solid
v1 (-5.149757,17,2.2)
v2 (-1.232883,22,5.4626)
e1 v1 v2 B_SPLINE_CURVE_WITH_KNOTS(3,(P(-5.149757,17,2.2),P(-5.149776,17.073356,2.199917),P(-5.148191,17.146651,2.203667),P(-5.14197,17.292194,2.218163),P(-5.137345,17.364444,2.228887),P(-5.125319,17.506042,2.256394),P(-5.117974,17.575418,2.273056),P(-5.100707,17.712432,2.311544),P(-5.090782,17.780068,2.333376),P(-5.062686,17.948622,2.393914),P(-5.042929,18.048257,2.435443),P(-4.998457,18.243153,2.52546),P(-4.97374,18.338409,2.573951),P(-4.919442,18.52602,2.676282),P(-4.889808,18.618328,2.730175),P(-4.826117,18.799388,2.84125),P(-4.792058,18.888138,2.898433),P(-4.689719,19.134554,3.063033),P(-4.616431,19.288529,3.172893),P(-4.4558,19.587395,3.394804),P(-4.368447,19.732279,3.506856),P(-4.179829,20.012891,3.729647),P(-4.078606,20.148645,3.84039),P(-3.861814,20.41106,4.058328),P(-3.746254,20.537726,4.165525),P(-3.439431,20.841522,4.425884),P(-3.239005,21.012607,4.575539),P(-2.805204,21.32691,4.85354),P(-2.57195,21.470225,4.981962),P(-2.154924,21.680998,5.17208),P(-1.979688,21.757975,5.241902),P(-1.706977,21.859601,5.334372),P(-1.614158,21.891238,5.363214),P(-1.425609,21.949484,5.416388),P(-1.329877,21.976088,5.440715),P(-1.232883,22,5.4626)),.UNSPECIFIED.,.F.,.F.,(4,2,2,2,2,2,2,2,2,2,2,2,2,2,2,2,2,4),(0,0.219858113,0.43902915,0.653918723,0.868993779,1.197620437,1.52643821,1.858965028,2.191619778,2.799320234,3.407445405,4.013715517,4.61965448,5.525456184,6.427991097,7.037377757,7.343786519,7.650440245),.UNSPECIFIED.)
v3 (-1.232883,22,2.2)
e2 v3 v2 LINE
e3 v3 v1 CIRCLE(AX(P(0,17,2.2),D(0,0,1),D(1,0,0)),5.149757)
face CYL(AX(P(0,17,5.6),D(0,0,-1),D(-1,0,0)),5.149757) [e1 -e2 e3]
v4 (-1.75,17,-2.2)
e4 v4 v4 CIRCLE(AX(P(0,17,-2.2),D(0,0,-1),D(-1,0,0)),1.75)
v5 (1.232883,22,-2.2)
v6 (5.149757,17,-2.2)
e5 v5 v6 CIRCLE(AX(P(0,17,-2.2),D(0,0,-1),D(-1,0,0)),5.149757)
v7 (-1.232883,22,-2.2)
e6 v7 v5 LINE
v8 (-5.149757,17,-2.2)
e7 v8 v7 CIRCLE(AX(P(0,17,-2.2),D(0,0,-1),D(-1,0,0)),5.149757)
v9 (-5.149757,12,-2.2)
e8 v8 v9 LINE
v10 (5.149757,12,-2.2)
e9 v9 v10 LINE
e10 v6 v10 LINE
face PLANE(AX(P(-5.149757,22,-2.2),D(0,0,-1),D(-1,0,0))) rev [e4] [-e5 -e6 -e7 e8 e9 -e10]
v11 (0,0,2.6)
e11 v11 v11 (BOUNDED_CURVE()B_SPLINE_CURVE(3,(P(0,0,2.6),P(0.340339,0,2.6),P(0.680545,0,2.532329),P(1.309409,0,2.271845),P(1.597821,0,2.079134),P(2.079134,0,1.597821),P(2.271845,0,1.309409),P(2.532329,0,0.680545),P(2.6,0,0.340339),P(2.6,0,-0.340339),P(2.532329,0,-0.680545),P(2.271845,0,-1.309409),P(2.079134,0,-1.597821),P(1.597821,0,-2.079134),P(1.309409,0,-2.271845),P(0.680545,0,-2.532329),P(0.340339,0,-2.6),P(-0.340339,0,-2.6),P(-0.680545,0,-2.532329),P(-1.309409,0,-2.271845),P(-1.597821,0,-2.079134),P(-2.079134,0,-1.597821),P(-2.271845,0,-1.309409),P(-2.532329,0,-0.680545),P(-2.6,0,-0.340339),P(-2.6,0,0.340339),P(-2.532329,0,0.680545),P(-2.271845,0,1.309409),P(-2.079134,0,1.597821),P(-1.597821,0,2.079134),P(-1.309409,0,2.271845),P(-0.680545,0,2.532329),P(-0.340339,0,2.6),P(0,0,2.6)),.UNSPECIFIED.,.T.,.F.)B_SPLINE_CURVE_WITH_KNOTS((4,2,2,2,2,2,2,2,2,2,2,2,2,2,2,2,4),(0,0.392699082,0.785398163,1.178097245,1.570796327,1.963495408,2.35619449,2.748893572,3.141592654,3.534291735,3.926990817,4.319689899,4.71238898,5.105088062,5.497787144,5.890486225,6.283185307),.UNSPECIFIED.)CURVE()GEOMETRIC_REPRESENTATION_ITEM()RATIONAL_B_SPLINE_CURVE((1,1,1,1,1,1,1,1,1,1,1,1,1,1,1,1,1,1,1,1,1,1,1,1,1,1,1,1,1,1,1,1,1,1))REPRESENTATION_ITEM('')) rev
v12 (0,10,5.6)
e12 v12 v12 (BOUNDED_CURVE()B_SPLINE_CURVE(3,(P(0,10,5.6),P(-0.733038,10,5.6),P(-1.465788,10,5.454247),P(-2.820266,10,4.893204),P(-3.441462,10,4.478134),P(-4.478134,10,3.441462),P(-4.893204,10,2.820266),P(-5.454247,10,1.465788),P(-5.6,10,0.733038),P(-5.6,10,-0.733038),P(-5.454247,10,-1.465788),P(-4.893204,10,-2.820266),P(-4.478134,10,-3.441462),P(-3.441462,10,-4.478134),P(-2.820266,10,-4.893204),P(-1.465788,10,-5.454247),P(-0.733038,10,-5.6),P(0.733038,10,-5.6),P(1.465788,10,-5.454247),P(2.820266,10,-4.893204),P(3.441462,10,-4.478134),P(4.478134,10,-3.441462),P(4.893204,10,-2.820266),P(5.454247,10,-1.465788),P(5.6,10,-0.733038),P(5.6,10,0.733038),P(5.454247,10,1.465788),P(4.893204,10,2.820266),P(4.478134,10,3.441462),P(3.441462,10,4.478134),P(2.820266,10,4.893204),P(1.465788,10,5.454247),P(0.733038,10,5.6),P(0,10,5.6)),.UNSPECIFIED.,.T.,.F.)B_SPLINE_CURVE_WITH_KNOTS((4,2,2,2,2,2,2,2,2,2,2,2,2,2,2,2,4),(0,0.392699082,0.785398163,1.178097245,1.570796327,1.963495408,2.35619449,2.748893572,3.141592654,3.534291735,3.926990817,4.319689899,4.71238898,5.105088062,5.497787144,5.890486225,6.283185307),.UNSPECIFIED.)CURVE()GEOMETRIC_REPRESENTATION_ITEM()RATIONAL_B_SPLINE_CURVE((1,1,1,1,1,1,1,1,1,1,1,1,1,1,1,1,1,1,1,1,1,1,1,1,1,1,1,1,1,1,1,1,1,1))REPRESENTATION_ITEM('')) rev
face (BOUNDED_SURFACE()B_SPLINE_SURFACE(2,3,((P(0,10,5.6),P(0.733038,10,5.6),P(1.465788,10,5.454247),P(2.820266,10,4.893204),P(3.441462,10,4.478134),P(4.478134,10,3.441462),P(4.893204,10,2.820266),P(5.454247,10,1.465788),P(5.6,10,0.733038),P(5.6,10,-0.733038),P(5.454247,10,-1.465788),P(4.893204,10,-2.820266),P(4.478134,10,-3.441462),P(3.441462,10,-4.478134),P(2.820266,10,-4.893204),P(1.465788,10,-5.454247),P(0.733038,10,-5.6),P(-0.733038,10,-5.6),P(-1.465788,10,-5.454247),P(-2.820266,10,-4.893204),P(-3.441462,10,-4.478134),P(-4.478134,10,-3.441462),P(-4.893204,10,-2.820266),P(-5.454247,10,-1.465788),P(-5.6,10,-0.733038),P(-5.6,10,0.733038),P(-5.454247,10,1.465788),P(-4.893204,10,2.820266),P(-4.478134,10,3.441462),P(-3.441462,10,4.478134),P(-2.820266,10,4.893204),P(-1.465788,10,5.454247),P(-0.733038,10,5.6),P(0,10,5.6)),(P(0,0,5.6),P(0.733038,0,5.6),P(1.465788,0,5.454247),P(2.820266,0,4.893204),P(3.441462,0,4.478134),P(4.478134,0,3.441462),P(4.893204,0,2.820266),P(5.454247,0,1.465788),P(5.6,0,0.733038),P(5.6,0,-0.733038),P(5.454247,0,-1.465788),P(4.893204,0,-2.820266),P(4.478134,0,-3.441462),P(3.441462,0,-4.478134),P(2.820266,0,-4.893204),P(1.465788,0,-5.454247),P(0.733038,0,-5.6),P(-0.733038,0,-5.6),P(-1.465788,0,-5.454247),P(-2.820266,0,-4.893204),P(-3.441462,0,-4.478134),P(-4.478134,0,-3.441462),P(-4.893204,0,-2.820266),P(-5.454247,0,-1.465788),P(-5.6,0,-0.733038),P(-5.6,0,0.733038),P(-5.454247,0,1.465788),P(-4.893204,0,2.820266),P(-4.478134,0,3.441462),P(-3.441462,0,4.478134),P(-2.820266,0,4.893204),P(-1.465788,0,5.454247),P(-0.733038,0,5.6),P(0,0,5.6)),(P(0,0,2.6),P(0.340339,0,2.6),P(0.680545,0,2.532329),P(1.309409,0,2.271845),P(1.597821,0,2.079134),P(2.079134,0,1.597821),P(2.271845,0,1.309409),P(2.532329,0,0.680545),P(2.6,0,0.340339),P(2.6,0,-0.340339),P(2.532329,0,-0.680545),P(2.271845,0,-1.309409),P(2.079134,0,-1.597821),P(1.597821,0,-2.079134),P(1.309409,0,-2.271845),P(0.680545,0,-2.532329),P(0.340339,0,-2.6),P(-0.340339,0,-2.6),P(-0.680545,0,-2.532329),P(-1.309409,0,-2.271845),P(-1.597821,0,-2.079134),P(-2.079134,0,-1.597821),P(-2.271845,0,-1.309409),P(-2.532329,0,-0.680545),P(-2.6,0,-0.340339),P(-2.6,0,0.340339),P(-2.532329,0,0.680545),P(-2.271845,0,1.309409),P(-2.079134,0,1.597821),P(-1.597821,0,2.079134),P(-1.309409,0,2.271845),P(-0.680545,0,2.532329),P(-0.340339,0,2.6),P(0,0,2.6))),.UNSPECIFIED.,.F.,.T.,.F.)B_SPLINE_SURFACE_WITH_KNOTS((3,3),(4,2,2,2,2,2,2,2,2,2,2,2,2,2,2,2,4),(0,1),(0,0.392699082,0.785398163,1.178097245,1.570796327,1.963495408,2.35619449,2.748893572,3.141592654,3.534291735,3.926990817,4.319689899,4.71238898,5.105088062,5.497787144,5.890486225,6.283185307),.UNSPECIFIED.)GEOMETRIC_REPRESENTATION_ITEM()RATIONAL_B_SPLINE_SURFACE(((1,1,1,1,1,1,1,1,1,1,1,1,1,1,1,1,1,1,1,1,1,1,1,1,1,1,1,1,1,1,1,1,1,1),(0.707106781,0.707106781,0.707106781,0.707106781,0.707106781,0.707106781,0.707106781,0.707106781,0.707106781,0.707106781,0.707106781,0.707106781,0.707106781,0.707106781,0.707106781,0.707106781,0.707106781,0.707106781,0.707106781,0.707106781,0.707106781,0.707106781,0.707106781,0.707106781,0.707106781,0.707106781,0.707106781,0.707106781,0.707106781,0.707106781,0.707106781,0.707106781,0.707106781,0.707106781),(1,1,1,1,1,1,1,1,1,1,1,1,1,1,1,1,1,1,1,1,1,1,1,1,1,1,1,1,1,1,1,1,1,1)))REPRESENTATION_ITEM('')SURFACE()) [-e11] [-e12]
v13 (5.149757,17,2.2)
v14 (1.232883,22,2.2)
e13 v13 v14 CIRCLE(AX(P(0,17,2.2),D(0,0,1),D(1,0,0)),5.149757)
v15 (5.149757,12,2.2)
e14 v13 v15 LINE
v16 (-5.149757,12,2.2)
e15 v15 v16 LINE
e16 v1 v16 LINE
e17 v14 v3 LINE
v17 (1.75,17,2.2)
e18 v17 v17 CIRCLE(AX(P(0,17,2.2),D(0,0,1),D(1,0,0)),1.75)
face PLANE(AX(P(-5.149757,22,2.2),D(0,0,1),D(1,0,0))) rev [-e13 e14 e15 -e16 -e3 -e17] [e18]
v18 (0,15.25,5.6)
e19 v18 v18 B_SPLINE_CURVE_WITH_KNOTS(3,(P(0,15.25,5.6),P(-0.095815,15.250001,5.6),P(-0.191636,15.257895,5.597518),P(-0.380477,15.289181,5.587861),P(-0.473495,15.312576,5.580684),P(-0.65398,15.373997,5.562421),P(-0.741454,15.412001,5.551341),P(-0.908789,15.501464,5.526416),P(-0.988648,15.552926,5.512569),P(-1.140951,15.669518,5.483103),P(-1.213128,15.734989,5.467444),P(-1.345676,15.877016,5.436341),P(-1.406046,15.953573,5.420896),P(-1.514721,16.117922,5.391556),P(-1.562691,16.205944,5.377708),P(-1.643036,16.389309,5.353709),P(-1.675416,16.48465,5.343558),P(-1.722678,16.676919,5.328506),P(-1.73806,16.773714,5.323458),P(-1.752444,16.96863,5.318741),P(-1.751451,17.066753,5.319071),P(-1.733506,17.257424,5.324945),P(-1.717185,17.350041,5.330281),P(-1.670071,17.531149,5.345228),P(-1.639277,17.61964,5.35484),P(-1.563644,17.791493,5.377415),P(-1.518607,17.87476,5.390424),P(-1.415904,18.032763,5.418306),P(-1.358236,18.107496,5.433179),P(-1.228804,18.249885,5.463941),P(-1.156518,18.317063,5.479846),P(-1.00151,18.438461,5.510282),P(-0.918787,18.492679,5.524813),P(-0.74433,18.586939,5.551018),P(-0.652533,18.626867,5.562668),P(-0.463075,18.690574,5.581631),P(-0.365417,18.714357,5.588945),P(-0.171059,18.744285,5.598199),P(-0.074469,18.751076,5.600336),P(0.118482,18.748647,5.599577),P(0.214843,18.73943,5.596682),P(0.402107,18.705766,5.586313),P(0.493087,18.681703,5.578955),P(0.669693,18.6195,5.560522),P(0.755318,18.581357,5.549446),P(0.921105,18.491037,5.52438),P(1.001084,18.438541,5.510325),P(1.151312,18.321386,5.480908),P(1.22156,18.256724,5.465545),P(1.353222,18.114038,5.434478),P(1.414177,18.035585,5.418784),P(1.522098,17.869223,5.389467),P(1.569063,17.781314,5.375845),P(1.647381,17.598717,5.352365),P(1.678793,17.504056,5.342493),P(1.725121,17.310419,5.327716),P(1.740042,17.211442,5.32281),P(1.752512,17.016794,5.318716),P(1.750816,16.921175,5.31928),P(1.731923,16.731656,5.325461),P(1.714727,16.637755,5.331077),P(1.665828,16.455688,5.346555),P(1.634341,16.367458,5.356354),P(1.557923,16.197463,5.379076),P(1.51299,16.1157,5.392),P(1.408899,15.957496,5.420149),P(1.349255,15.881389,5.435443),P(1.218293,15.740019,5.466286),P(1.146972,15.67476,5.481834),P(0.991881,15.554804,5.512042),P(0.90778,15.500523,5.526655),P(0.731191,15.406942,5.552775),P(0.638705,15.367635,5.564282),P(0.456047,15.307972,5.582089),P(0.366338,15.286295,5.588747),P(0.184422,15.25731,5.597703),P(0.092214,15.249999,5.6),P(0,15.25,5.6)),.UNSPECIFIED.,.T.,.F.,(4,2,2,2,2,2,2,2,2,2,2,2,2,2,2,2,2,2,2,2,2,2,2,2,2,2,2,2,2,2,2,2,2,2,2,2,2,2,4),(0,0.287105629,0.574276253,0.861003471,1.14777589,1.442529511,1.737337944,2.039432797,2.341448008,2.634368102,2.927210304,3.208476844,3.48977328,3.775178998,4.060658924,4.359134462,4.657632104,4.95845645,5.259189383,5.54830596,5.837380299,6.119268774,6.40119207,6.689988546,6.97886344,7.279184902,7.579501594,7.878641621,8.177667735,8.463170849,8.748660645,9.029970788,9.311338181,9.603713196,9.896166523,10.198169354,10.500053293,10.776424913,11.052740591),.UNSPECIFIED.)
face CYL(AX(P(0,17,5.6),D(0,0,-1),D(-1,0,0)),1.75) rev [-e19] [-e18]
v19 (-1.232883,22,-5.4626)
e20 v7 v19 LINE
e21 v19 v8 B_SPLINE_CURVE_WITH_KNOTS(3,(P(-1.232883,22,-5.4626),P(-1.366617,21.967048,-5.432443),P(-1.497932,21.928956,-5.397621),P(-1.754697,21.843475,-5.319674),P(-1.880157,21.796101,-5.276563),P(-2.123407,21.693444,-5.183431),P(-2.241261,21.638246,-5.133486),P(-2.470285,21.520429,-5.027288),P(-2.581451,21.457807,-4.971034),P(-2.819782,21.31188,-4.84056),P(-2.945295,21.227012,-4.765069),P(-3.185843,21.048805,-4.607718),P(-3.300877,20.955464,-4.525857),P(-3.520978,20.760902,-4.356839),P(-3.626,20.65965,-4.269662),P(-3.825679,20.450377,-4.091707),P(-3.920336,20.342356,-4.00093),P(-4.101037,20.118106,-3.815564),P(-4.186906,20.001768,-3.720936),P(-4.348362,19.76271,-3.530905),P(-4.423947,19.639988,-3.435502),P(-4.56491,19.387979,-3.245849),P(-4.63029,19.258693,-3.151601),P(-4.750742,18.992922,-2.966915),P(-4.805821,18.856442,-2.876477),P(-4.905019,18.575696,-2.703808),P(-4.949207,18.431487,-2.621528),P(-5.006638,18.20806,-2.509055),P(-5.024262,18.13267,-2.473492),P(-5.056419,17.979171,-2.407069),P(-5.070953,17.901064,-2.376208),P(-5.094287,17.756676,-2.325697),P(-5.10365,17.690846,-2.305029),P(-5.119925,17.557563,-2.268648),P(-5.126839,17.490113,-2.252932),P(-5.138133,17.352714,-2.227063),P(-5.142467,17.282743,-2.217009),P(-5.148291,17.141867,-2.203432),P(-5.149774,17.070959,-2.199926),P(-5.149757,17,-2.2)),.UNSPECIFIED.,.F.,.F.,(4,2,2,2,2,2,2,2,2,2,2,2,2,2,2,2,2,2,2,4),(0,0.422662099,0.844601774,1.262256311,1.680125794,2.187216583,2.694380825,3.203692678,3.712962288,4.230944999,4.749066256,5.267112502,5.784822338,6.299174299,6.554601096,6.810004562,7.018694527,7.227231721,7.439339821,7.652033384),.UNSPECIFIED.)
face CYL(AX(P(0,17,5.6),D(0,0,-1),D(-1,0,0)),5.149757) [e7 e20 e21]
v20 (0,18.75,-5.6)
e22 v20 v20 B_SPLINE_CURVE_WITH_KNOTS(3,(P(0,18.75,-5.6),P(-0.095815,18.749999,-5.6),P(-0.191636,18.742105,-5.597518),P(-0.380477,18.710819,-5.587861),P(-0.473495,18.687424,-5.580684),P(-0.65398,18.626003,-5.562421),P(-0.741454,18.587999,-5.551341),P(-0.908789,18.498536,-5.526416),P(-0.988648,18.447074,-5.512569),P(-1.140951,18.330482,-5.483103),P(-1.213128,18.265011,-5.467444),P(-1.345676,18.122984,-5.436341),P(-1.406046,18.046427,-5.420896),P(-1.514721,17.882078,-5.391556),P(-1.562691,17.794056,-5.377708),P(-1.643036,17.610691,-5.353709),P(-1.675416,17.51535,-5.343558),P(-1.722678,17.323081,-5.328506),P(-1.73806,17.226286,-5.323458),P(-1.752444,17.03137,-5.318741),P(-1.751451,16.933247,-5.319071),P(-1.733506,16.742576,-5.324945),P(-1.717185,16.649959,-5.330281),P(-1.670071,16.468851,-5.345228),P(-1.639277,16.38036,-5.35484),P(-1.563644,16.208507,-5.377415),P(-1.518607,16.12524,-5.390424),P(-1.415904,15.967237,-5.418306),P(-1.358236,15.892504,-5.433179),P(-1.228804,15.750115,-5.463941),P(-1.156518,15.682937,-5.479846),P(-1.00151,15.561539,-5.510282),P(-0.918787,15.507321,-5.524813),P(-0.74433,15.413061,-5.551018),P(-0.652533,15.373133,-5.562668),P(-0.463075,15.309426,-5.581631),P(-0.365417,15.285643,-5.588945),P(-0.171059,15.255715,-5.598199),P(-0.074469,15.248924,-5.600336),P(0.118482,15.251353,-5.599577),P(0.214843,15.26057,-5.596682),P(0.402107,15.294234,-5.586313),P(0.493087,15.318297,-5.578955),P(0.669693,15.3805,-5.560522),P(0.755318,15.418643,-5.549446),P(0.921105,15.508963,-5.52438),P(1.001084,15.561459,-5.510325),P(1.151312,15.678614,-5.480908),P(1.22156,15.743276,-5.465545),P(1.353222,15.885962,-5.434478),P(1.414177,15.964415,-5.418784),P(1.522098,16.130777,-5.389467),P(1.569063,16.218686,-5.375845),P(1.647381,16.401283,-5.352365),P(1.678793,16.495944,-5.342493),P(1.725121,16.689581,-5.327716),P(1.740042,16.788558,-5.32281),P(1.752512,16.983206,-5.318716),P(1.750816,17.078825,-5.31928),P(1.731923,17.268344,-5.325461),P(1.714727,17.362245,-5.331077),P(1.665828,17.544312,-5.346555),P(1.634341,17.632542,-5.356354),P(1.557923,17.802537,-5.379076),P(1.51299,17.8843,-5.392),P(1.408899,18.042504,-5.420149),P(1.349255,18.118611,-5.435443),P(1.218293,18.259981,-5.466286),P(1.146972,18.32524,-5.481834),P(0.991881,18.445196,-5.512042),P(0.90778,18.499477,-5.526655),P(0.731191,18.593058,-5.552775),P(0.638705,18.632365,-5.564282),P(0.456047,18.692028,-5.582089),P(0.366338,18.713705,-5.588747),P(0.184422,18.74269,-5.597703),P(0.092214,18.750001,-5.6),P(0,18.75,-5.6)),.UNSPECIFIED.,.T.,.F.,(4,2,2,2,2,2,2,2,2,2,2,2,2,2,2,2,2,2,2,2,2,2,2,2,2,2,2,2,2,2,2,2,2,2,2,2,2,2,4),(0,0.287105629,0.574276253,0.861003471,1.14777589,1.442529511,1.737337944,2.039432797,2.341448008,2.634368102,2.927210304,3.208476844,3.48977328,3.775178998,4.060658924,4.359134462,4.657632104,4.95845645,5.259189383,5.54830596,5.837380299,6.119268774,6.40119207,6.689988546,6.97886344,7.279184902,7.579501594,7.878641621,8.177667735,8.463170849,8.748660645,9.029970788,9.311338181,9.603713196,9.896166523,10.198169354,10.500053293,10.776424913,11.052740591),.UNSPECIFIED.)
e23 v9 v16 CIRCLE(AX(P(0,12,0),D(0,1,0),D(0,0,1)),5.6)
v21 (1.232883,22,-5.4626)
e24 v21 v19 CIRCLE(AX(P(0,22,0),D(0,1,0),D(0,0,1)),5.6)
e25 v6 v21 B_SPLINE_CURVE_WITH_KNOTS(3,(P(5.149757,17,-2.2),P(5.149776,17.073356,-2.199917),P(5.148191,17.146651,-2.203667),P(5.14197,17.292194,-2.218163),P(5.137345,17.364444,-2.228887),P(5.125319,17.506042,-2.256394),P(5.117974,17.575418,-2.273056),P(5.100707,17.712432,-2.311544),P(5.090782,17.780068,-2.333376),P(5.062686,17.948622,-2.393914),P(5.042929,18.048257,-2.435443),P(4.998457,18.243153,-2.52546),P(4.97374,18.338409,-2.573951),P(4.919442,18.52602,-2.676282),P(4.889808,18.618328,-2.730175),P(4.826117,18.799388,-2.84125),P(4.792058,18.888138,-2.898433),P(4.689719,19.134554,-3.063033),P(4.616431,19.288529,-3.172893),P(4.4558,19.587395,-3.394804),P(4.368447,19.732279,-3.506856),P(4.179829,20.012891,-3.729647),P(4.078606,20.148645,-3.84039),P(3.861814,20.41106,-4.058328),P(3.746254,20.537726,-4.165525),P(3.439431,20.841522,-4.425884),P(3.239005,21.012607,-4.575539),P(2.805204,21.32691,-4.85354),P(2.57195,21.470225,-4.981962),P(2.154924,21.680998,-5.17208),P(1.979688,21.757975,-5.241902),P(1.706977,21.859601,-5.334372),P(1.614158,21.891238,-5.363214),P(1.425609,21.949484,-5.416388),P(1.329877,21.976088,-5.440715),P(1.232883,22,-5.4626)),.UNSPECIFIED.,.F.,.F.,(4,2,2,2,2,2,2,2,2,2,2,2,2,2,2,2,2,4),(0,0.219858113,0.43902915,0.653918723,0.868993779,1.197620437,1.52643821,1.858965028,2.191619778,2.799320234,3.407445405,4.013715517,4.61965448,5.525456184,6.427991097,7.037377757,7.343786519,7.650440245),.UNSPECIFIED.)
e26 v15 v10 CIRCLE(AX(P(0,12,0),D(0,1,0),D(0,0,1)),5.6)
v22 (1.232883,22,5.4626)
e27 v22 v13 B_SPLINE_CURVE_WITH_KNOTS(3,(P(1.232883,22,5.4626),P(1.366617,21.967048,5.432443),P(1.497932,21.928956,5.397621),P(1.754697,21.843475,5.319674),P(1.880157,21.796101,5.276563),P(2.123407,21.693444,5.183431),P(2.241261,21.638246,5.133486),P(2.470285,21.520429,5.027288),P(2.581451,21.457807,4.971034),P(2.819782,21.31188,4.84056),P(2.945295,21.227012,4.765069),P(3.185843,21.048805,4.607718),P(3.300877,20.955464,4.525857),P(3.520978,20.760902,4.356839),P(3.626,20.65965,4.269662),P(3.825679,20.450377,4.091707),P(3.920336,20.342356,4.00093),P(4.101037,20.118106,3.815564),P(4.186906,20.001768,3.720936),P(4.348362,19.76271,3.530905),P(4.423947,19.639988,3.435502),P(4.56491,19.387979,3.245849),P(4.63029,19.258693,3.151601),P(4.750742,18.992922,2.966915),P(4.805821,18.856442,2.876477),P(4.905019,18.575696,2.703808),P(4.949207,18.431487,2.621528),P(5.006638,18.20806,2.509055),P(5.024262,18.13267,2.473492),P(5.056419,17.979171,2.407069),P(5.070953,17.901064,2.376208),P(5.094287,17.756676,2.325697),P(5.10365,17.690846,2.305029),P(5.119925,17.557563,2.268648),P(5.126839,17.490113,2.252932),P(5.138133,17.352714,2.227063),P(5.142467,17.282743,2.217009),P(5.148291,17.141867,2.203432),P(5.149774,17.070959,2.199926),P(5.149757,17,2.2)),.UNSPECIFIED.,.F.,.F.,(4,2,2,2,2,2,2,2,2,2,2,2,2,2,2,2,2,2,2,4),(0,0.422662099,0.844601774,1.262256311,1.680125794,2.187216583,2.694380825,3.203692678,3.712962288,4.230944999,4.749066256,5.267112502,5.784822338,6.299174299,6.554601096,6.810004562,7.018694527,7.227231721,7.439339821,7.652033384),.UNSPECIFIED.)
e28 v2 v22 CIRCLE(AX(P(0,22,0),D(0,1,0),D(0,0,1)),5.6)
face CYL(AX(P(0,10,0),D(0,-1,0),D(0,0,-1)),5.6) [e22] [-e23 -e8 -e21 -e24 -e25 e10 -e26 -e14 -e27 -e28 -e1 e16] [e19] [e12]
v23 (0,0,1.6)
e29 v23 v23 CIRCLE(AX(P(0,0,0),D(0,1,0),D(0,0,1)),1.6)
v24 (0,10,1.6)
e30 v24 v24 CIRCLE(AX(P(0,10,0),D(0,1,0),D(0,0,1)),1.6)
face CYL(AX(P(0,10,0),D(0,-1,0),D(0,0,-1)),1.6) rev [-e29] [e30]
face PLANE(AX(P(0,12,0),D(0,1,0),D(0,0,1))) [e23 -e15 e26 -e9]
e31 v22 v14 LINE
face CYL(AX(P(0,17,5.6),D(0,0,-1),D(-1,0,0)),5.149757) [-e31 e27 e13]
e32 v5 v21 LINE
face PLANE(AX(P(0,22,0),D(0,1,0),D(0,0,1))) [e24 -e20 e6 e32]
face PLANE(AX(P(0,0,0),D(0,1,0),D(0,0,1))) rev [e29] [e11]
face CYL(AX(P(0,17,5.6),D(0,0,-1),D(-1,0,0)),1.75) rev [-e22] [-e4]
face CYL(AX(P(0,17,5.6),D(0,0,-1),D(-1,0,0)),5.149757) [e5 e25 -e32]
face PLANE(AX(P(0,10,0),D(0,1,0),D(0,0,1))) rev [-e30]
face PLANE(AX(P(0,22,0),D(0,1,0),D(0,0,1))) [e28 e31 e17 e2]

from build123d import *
from build123d.topology import SkipClean

# Parameters (mm, degrees)
SKETCH1_R               = 5.6
SKETCH1_R_2             = 1.6
BOSS_EXTRUDE1_DEPTH     = 10
SKETCH2_R               = 5.6
BOSS_EXTRUDE2_DEPTH     = 2
BOSS_EXTRUDE3_DEPTH     = 10
CUT_EXTRUDE1_DEPTH      = 25.004166
CUT_EXTRUDE1_DEPTH_BACK = 25.004166
SKETCH4_R               = 1.75
FILLET1_SIZE            = 10
FILLET1_SIZE_2          = 3


with BuildPart() as part:
    # Sketch1 → Boss-Extrude1 (new body)
    with BuildSketch(Plane(origin=(0, 0, 0), x_dir=(1, 0, 0), z_dir=(0, 1, 0))):
        with Locations(Location((0, 0, 0), (0, 0, 270))):
            Circle(SKETCH1_R)
        with Locations(Location((0, 0, 0), (0, 0, 270))):
            Circle(SKETCH1_R_2, mode=Mode.SUBTRACT)
    extrude(amount=BOSS_EXTRUDE1_DEPTH)

    # Sketch2 → Boss-Extrude2 (add)
    with BuildSketch(Plane(origin=(0, 10, 0), x_dir=(1, 0, 0), z_dir=(0, 1, 0))):
        with Locations(Location((0, 0, 0), (0, 0, 270))):
            Circle(SKETCH2_R)
    extrude(amount=BOSS_EXTRUDE2_DEPTH)

    # Sketch3 → Boss-Extrude3 (add)
    with BuildSketch(Plane(origin=(0, 12, 0), x_dir=(1, 0, 0), z_dir=(0, 1, 0))):
        with BuildLine():
            Line((-5.149757, 2.2), (5.149757, 2.2))
            ThreePointArc((5.149757, 2.2), (0, 5.6), (-5.149757, 2.2))
        make_face()
        with BuildLine():
            Line((-5.149757, -2.2), (5.149757, -2.2))
            ThreePointArc((5.149757, -2.2), (0, -5.6), (-5.149757, -2.2))
        make_face()
    extrude(amount=BOSS_EXTRUDE3_DEPTH)

    # Sketch4 → Cut-Extrude1 (cut, two sides: drawn at the far end of the back side and taken through both)
    with SkipClean():  # the faces are left unmerged after this step: merging them gives an invalid solid
        with BuildSketch(Plane(origin=(0, 0, 2.2), x_dir=(-1, 0, 0), z_dir=(0, 0, -1)).offset(-CUT_EXTRUDE1_DEPTH_BACK)):
            with BuildLine():
                Line((5.149757, 22.1), (5.149757, 22))
                Line((5.149757, 22), (1.232883, 22))
                ThreePointArc((1.232883, 22), (4.053952, 20.175764), (5.149757, 17))
                Line((5.149757, 17), (5.149757, 12))
                Line((5.149757, 12), (5.249757, 12))
                Line((5.249757, 12), (5.249757, 22.1))
                Line((5.249757, 22.1), (5.149757, 22.1))
            make_face()
            with BuildLine():
                ThreePointArc((-5.149757, 17), (-4.053952, 20.175764), (-1.232883, 22))
                Line((-1.232883, 22), (-5.149757, 22))
                Line((-5.149757, 22), (-5.149757, 22.1))
                Line((-5.149757, 22.1), (-5.249757, 22.1))
                Line((-5.249757, 22.1), (-5.249757, 12))
                Line((-5.249757, 12), (-5.149757, 12))
                Line((-5.149757, 12), (-5.149757, 17))
            make_face()
            with Locations(Location((0, 17, 0), (0, 0, 270))):
                Circle(SKETCH4_R)
        extrude(amount=CUT_EXTRUDE1_DEPTH + CUT_EXTRUDE1_DEPTH_BACK, mode=Mode.SUBTRACT)

    # Fillet1
    # an asymmetric fillet: 10, 3 mm, written as the material it takes off along each edge
    with BuildSketch(Plane(origin=(0, 0, 0), x_dir=(0, 0, 1), z_dir=(-1, 0, 0))) as fillet1_piece_1:
        with BuildLine():
            Bezier((5.6, FILLET1_SIZE), (5.6, 0), (5.6 - FILLET1_SIZE_2, 0), weights=[1, 0.707107, 1])
            Line((5.6 - FILLET1_SIZE_2, 0), (5.6, 0))
            Line((5.6, 0), (5.6, FILLET1_SIZE))
        make_face()
    revolve(axis=Axis((0, 0, 0), (0, 1, 0)), mode=Mode.SUBTRACT)


solid = part.part
